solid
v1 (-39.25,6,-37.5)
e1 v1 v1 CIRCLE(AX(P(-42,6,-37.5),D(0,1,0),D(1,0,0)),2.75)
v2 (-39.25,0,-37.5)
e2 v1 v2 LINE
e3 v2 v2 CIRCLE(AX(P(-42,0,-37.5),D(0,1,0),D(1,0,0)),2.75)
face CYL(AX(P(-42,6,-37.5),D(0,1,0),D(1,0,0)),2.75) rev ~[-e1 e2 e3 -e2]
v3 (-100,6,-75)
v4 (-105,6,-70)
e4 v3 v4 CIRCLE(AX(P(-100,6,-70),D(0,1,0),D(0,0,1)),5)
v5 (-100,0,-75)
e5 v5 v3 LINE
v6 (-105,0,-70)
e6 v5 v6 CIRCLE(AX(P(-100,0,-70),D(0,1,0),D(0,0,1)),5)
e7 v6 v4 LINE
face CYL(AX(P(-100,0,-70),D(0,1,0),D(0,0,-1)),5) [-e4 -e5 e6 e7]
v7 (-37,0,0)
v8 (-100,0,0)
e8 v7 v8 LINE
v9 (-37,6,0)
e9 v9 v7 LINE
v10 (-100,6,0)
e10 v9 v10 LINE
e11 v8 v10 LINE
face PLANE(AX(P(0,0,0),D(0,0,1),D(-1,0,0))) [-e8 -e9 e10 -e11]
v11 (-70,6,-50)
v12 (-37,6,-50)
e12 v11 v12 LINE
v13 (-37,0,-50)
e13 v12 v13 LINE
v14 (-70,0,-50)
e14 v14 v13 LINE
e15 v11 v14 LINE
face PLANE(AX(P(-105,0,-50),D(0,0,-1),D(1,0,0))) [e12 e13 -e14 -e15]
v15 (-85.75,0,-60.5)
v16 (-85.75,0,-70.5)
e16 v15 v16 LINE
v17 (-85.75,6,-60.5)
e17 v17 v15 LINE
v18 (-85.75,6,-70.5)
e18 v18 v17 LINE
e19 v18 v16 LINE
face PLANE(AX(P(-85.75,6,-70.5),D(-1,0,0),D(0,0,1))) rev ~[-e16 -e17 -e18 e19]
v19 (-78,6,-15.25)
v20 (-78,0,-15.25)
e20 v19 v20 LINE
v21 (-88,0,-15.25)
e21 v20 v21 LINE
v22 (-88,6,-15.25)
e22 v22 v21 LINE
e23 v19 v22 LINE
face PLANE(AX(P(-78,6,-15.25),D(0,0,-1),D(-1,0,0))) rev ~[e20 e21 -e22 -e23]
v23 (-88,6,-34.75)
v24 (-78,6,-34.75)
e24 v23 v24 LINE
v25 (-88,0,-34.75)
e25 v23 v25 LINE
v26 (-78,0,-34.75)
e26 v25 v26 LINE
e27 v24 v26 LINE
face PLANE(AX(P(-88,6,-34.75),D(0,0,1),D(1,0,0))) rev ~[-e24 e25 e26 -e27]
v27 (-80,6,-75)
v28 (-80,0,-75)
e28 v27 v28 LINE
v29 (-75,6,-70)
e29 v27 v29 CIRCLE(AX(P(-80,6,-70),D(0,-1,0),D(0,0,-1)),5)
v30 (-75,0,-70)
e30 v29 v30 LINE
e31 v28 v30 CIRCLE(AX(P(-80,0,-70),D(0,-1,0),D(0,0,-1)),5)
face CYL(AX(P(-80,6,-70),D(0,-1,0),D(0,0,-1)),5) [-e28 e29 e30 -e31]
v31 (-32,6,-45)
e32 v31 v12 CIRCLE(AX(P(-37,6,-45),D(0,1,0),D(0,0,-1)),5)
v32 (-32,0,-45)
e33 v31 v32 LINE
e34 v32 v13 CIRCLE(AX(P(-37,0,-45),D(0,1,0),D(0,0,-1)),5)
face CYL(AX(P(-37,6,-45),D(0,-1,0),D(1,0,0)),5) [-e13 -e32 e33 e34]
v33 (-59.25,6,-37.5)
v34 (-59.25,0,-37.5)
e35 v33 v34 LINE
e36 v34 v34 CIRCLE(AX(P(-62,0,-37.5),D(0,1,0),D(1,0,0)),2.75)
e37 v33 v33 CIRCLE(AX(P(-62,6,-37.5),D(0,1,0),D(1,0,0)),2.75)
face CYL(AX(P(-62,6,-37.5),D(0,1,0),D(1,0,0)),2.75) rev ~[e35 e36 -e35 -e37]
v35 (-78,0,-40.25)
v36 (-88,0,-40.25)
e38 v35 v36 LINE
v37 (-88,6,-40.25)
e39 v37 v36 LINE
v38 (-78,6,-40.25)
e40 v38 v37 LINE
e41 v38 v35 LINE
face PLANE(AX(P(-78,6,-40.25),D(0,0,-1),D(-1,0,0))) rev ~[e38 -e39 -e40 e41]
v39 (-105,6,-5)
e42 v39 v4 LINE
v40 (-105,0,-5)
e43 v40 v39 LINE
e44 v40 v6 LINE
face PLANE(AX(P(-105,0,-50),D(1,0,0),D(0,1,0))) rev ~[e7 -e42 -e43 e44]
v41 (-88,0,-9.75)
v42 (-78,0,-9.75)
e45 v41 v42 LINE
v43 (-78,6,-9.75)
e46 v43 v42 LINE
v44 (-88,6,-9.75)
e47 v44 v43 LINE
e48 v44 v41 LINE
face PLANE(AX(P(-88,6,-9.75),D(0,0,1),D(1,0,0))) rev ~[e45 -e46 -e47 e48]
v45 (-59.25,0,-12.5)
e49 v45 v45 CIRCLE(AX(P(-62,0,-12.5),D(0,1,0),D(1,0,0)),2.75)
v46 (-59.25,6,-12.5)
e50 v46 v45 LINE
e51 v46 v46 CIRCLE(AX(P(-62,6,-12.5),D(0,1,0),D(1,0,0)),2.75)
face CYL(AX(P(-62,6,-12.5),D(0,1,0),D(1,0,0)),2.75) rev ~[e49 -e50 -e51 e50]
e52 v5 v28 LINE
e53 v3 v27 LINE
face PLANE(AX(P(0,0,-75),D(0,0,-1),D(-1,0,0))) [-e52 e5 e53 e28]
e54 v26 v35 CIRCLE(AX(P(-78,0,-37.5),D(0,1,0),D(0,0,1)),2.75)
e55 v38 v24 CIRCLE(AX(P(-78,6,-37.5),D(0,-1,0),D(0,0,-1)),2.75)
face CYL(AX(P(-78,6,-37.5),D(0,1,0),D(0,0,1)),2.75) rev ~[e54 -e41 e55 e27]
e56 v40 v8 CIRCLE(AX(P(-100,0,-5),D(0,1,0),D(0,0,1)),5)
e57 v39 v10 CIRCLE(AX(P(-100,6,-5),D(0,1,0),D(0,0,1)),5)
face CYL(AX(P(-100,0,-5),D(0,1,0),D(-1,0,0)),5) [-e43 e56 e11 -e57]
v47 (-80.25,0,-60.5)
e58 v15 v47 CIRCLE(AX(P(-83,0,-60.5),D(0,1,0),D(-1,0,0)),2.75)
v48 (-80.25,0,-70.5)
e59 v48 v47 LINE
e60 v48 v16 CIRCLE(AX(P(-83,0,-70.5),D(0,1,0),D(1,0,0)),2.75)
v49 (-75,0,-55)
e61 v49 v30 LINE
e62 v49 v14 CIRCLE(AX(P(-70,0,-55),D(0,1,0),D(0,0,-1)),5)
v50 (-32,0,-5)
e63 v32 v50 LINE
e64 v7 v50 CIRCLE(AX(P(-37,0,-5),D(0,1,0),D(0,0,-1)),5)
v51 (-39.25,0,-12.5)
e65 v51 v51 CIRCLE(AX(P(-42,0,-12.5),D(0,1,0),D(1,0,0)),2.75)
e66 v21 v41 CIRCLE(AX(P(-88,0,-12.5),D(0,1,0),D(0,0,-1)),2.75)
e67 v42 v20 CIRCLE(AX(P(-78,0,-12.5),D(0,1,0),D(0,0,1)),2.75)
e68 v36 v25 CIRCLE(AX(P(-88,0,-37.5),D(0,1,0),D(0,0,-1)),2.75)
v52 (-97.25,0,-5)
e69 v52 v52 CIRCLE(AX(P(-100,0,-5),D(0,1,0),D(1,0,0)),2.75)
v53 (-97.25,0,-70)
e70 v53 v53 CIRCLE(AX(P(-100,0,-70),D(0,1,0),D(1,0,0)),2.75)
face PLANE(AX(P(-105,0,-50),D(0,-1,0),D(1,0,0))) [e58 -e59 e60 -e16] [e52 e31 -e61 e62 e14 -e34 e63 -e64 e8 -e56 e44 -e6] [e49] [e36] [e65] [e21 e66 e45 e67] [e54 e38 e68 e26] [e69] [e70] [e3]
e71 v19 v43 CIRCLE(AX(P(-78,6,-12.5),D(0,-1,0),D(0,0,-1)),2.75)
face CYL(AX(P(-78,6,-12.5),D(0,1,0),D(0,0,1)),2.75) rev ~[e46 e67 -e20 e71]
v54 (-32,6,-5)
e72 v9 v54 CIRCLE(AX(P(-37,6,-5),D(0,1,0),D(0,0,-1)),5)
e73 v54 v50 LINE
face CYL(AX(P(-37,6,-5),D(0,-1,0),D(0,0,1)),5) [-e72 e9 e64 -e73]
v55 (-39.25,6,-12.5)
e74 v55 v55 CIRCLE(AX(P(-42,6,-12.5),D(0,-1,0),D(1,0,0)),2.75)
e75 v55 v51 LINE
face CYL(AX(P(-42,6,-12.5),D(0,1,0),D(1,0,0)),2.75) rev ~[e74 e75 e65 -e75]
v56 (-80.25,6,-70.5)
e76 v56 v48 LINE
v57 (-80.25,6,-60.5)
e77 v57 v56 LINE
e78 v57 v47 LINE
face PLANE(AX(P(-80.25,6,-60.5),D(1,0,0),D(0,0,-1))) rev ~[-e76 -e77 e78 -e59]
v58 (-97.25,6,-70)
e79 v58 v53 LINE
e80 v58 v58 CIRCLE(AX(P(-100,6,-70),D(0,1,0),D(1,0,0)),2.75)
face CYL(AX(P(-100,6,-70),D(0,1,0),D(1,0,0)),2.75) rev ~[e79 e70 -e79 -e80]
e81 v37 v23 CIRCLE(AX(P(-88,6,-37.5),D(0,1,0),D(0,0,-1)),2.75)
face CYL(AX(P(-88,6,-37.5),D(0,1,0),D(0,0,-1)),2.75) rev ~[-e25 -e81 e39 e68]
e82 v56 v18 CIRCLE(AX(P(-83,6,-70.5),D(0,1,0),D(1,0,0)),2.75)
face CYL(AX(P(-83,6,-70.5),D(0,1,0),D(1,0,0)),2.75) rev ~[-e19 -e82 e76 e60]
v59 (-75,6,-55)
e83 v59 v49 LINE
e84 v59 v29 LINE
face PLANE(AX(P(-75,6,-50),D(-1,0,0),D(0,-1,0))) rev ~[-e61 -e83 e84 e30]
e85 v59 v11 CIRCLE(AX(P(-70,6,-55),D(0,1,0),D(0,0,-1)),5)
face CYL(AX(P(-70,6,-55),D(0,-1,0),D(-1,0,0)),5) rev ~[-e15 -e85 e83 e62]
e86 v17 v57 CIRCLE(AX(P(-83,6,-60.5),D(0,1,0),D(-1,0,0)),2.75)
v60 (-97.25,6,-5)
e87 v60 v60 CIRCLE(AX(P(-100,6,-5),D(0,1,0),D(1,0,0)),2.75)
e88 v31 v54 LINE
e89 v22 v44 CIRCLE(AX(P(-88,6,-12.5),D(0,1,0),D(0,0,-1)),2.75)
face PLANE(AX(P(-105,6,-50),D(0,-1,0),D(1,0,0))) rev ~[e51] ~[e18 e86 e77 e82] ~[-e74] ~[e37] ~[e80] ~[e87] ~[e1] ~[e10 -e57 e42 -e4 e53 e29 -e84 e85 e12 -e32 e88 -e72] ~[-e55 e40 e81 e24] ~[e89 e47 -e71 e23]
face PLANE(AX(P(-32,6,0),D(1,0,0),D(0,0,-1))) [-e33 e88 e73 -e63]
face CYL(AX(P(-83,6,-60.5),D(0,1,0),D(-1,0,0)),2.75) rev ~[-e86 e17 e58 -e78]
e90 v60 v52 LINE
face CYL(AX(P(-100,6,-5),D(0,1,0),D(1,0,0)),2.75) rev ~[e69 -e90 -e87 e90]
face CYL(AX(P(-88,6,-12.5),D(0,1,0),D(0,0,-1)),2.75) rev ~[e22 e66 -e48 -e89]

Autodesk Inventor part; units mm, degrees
ref_plane "YZ Plane" through (0, 0, 0) normal (1, 0, 0) x (0, 1, 0)
ref_plane "XZ Plane" through (0, 0, 0) normal (0, 1, 0) x (-1, 0, 0)
ref_plane "XY Plane" through (0, 0, 0) normal (0, 0, 1) x (1, 0, 0)
sketch "Sketch1" plane through (0, 0, 0) normal (0, 1, 0) x (-1, 0, 0)
  line L0 (0, 0) -> (105, 0)
  line L1 (105, 0) -> (105, -50)
  line L2 (105, -50) -> (0, -50)
  line L3 (0, -50) -> (0, 0)
  line L4 (0, 0) -> (0, -16.6667)
  line L5 (0, -16.6667) -> (11, -16.6667)
  dimension "d0" = 105
  dimension "d1" = 50
  dimension "d2" = 16.6667
  dimension "d3" = 11
extrude "Extrusion1" add sketch "Sketch1" along normal blind 6
sketch "Sketch3" plane through (0, 6, 0) normal (0, 1, 0) x (1, 0, 0)
  circle A0 centre (-20, 12.5) radius 2.75
  line L0 (0, 0) -> (0, 50) projected
  line L1 (-105, 0) -> (0, 0) projected
  circle A1 centre (-20, 37.5) radius 2.75
  dimension "d21" = 5.5
  dimension "d22" = 20
  dimension "d23" = 12.5
  dimension "d26" = 25
extrude "Extrusion3" cut sketch "Sketch3" against normal through all
sketch "Sketch4" plane through (0, 6, 0) normal (0, 1, 0) x (1, 0, 0)
  circle A0 centre (-20, 12.5) radius 2.75 projected
  line L0 (-20, 12.5) -> (-78, 12.5)
  line L1 (-78, 12.5) -> (-88, 12.5) construction
  line L2 (-78, 15.25) -> (-88, 15.25)
  line L3 (-88, 9.75) -> (-78, 9.75)
  arc A1 (-78, 9.75) -> (-78, 15.25) centre (-78, 12.5) ccw
  arc A2 (-88, 15.25) -> (-88, 9.75) centre (-88, 12.5) ccw
  point P0 (0, 0)
  point P1 (-83, 12.5)
  dimension "d33" = 58
  dimension "d34" = 10
  dimension "d35" = 5.5
extrude "Extrusion4" cut sketch "Sketch4" against normal through all contours A1 L3 A2 L2
pattern_linear "Rectangular Pattern2" count 2 spacing 25 along (0, 0, -1) of "Extrusion4"
sketch "Sketch5" plane through (0, 0, -50) normal (0, 0, -1) x (-1, 0, 0)
  line L0 (105, 0) -> (105, 6) projected
  line L1 (105, 0) -> (0, 0) projected
  line L2 (105, 6) -> (75, 6)
  line L3 (75, 6) -> (75, 0)
  line L4 (75, 0) -> (105, 0)
  line L5 (105, 0) -> (105, 6)
  dimension "d45" = 30
extrude "Extrusion5" add sketch "Sketch5" along normal blind 25
sketch "Sketch6" plane through (0, 6, 0) normal (0, 1, 0) x (1, 0, 0)
  line L0 (-83, 60.5) -> (-83, 70.5) construction
  line L1 (-80.25, 60.5) -> (-80.25, 70.5)
  line L2 (-85.75, 70.5) -> (-85.75, 60.5)
  arc A0 (-85.75, 60.5) -> (-80.25, 60.5) centre (-83, 60.5) ccw
  arc A1 (-80.25, 70.5) -> (-85.75, 70.5) centre (-83, 70.5) ccw
  line L3 (-75, 50) -> (-75, 75) projected
  arc A2 (-88, 40.25) -> (-88, 34.75) centre (-88, 37.5) ccw projected
  point P0 (0, 0)
  point P1 (-83, 65.5)
  dimension "d48" = 10
  dimension "d49" = 5.5
  dimension "d50" = 8
  dimension "d51" = 28
extrude "Extrusion6" cut sketch "Sketch6" against normal through all
fillet "Fillet2" radius 5 6 edges at (-105, 3, 0) (0, 3, 0) (-75, 3, -75) (-105, 3, -75) (0, 3, -50) (-75, 3, -50)
sketch "Sketch7" plane through (0, 6, 0) normal (0, 1, 0) x (1, 0, 0)
  circle A0 centre (-20, 12.5) radius 2.75 projected
  line L0 (-20, 12.5) -> (-42, 12.5)
  line L1 (-42, 12.5) -> (-62, 12.5)
  circle A1 centre (-62, 12.5) radius 2.75
  circle A2 centre (-42, 12.5) radius 2.75
  line L2 (0, 5) -> (0, 45) projected
  line L3 (0, 0) -> (0, 45)
  circle A3 centre (-42, 37.5) radius 2.75
  circle A4 centre (-62, 37.5) radius 2.75
  dimension "d55" = 22
  dimension "d56" = 20
  dimension "d57" = 5.5
  dimension "d58" = 5.5
  dimension "d61" = 25
extrude "Extrusion7" cut sketch "Sketch7" against normal through all contours A2 L1 L0 | L0 L1 A2 | A1 | A3 | A4
sketch "Sketch9" plane through (0, 6, 0) normal (0, 1, 0) x (1, 0, 0)
  point P0 (0, 0)
sketch "Sketch10" plane through (0, 6, 0) normal (0, 1, 0) x (1, 0, 0)
  circle A0 centre (-100, 70) radius 2.75
  line L0 (-100, 75) -> (-80, 75) projected
  line L1 (-105, 5) -> (-105, 70) projected
  circle A1 centre (-100, 5) radius 2.75
  line L2 (-100, 0) -> (-5, 0) projected
  circle A2 centre (-5, 45) radius 2.75
  line L3 (-5, 50) -> (-70, 50) projected
  line L4 (0, 5) -> (0, 45) projected
  circle A3 centre (-5, 5) radius 2.75
  point P0 (0, 0)
  dimension "d70" = 5.5
  dimension "d71" = 5
  dimension "d72" = 5
  dimension "d73" = 5.5
  dimension "d74" = 5
  dimension "d75" = 5
  dimension "d76" = 5.5
  dimension "d77" = 5
  dimension "d78" = 5
  dimension "d79" = 5.5
  dimension "d80" = 5
  dimension "d81" = 5
extrude "Extrusion9" cut sketch "Sketch10" against normal through all
sketch "Sketch12" plane through (0, 6, 0) normal (0, 1, 0) x (1, 0, 0)
  circle A0 centre (-42, 37.5) radius 2.75 projected
  line L0 (-42, 37.5) -> (-32, 37.5)
  line L1 (-32, 37.5) -> (-32, 50)
  line L2 (-5, 50) -> (-70, 50) projected
  line L3 (-32, 50) -> (0, 50)
  line L4 (0, 50) -> (0, 0)
  line L5 (0, 0) -> (-32, 0)
  line L6 (-32, 0) -> (-32, 50)
  dimension "d87" = 10
extrude "Extrusion10" cut sketch "Sketch12" against normal blind 10 contours L1 L2 L3 L4 L5 L6
fillet "Fillet3" radius 5 2 edges at (-32, 3, 0) (-32, 3, -50)
properties part number "X_Carriage_Plate_Short"
